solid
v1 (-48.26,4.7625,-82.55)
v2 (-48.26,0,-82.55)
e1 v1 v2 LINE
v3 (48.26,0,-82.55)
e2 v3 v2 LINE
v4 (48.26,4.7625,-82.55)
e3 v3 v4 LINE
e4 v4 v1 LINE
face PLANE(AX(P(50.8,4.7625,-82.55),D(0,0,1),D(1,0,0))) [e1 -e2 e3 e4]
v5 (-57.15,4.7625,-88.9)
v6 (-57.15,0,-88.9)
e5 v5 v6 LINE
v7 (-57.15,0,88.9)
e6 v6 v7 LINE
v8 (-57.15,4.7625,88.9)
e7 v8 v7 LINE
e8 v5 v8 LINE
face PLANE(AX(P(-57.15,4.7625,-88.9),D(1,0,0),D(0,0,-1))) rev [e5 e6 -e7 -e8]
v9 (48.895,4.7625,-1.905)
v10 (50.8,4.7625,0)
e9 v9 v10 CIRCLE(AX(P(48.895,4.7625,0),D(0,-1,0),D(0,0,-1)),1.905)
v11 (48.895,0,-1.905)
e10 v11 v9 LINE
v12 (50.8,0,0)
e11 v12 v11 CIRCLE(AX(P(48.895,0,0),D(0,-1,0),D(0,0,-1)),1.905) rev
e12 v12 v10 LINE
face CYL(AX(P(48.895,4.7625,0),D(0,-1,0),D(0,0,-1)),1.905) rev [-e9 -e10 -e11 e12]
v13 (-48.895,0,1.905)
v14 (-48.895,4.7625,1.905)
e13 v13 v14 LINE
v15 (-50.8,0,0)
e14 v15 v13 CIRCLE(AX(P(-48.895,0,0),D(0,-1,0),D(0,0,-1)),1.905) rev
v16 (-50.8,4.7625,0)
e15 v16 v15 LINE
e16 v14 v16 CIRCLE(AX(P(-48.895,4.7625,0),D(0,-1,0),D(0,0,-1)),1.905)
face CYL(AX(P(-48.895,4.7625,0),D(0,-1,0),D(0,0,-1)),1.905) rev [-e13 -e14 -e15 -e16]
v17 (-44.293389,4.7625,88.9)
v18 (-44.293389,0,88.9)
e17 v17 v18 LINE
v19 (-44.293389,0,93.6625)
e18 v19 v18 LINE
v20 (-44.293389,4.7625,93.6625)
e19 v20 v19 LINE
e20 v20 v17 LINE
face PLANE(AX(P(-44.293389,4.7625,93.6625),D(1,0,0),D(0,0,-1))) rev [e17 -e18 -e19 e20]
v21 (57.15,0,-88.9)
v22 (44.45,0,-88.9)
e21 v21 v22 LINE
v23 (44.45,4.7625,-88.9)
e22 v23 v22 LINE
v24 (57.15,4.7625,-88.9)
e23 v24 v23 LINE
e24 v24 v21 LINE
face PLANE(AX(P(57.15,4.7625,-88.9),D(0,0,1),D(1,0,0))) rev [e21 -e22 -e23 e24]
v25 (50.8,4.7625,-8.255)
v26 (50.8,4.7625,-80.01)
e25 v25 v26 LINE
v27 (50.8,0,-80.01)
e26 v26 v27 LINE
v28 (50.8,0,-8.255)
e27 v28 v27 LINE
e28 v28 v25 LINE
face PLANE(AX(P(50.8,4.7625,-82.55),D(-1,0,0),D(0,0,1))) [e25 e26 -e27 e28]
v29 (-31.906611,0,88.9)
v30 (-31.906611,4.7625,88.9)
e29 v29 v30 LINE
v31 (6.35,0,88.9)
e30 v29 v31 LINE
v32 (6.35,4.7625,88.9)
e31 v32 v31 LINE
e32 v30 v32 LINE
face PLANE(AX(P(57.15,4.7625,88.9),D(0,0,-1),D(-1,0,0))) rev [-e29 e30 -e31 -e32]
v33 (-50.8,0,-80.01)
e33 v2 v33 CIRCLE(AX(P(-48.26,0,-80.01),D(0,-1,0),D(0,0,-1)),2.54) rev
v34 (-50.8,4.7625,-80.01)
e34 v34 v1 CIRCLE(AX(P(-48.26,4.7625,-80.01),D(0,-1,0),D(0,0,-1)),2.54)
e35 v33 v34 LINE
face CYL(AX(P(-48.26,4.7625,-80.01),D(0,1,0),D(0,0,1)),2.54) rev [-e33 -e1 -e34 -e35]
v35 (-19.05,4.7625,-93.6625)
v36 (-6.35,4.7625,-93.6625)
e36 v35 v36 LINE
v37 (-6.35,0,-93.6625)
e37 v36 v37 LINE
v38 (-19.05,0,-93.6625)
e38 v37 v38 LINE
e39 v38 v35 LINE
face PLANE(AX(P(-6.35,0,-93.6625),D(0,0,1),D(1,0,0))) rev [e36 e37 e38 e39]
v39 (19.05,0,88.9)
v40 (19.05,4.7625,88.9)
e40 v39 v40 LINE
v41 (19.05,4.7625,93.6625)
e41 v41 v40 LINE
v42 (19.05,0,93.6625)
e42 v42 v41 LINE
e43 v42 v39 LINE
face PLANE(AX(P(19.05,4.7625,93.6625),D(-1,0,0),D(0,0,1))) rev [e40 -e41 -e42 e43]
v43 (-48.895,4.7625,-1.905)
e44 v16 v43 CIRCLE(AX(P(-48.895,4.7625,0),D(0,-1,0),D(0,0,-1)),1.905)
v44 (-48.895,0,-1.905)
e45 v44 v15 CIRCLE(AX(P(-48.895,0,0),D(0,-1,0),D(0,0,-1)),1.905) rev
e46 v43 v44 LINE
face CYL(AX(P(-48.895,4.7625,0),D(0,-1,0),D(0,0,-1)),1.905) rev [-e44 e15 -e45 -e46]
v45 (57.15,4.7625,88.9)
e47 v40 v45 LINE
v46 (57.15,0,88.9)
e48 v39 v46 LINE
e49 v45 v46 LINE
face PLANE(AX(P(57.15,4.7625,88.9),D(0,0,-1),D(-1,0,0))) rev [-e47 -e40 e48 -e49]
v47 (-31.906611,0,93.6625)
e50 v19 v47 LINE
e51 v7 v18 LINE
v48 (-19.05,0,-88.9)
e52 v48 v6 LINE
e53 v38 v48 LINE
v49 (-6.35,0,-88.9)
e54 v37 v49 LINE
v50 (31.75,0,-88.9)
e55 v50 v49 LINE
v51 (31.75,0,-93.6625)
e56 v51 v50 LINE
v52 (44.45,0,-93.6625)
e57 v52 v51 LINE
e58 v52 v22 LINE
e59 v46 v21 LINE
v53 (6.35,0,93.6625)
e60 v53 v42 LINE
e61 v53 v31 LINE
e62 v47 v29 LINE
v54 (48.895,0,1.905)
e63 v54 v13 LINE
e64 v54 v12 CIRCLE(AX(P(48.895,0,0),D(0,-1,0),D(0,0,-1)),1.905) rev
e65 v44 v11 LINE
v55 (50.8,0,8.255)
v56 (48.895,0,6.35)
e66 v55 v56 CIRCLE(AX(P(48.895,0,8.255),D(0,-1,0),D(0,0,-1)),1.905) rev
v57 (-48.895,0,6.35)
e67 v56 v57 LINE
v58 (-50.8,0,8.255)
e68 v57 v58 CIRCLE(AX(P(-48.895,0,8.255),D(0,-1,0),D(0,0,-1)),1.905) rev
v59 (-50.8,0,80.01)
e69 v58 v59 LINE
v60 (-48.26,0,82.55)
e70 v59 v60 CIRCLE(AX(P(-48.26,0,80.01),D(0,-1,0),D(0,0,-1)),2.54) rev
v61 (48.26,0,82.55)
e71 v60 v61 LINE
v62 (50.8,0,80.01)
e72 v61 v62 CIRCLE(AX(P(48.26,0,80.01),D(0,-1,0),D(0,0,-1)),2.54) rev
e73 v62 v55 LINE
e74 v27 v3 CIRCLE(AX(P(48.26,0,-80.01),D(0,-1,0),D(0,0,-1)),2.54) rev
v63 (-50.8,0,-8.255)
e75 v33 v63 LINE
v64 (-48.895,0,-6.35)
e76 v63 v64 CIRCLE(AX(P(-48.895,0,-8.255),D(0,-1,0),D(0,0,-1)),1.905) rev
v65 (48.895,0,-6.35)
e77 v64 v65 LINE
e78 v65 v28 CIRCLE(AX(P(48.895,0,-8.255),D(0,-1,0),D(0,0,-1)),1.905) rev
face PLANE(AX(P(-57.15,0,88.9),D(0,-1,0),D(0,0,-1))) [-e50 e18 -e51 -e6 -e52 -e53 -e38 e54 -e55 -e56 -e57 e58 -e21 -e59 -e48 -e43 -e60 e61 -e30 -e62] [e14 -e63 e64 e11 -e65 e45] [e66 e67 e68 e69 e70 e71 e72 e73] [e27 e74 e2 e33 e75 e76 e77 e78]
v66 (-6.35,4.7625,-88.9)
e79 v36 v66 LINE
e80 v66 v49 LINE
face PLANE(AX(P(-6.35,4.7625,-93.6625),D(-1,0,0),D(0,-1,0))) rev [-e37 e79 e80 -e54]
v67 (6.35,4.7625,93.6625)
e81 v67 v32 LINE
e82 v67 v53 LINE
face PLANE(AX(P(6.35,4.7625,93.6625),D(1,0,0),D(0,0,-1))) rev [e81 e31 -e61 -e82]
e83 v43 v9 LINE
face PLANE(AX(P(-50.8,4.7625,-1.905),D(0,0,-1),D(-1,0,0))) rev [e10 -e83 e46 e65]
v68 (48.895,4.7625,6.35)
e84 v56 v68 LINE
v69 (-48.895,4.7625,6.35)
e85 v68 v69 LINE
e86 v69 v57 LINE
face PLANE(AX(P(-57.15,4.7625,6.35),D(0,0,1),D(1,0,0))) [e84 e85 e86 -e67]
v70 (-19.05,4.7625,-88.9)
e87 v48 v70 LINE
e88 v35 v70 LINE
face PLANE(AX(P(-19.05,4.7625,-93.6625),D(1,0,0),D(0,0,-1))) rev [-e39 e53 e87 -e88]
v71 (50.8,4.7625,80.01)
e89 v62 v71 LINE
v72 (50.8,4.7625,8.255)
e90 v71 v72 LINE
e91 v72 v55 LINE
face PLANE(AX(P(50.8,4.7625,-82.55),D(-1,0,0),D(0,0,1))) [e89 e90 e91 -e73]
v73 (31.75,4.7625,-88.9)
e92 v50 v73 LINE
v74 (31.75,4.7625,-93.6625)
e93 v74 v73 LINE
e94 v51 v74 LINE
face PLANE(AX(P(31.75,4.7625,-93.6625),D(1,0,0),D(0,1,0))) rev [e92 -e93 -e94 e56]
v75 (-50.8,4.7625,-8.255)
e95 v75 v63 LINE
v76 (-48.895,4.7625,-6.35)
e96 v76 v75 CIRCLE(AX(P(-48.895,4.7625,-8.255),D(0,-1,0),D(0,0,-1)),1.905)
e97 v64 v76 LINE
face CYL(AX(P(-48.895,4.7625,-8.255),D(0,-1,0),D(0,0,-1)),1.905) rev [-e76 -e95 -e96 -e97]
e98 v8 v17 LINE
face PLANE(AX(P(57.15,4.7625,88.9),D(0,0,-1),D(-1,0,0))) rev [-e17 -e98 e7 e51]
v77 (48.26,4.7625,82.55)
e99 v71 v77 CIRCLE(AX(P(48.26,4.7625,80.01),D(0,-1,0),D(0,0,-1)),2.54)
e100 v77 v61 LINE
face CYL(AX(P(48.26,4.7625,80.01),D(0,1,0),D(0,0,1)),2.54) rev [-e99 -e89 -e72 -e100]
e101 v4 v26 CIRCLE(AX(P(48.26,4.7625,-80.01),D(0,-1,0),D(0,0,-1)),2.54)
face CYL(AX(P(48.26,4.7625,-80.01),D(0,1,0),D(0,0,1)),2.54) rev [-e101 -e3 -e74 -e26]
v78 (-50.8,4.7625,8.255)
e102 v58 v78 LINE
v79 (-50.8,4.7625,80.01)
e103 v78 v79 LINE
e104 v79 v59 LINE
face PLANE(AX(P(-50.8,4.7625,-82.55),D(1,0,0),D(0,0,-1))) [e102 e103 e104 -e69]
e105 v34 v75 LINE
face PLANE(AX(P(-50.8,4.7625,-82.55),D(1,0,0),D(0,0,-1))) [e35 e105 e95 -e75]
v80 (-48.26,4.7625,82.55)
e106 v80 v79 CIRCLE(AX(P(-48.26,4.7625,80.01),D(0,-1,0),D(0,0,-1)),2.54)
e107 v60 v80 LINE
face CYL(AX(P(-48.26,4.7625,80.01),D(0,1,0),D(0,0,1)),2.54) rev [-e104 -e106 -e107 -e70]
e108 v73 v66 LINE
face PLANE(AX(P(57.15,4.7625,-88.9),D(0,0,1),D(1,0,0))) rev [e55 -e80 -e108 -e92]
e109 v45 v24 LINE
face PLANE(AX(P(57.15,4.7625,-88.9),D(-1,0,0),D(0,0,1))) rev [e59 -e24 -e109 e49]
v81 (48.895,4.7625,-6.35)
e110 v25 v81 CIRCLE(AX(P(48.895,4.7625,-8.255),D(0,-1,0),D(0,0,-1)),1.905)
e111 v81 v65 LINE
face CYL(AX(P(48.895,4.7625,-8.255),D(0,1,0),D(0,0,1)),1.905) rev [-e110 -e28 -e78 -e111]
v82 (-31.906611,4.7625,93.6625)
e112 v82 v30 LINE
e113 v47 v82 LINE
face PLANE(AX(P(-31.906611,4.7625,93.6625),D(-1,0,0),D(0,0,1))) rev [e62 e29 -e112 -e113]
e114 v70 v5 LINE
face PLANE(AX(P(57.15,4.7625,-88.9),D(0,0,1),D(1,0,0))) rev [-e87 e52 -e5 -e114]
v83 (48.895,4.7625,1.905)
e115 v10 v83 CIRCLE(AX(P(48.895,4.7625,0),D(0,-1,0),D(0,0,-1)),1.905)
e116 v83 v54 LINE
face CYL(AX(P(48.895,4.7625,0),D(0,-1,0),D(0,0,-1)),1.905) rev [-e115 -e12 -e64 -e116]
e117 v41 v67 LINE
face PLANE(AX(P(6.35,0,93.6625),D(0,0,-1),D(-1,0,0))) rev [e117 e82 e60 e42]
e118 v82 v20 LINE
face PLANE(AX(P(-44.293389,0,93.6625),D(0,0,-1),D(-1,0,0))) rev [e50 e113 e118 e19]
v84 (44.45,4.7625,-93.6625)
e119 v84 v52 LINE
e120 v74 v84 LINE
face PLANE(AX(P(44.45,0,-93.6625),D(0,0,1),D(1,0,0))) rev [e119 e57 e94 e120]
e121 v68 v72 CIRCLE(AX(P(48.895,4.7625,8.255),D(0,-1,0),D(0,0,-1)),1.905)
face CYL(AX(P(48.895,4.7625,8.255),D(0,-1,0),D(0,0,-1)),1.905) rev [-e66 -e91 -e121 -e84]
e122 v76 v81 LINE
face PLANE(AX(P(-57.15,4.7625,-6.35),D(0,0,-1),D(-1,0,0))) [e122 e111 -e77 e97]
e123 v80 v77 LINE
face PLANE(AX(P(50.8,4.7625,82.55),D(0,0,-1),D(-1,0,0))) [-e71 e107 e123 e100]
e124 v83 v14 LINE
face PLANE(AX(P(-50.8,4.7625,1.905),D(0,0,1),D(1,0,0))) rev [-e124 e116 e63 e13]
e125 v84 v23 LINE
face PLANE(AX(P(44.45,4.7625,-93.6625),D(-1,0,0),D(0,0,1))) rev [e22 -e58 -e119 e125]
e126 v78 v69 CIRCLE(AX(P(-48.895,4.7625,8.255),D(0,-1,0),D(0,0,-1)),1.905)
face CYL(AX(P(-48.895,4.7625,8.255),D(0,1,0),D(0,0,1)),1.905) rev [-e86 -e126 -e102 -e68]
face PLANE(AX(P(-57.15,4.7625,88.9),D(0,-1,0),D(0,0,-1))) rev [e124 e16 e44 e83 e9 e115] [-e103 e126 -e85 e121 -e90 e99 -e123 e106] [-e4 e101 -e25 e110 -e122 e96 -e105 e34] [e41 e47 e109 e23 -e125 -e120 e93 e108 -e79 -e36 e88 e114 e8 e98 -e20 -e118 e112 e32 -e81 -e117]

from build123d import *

# Parameters (mm, degrees)
SKETCH1_W           = 114.3
SKETCH1_H           = 177.8
SKETCH1_W_2         = 101.6
SKETCH1_H_2         = 165.1
BOSS_EXTRUDE1_DEPTH = 4.7625
SKETCH2_W           = 12.38677804
SKETCH2_H           = 4.7625
SKETCH2_W_2         = 12.7
BOSS_EXTRUDE2_DEPTH = 4.7625
SKETCH3_W           = 12.7
SKETCH3_H           = 4.7625
BOSS_EXTRUDE3_DEPTH = 4.7625
FILLET1_R           = 2.54
SKETCH5_W           = 114.3
SKETCH5_H           = 12.7
SKETCH5_W_2         = 101.6
SKETCH5_H_2         = 3.81
BOSS_EXTRUDE5_DEPTH = 4.7625
FILLET3_R           = 1.905


with BuildPart() as part:
    # Sketch1 → Boss-Extrude1 (new body)
    with BuildSketch(Plane(origin=(0, 0, 0), x_dir=(1, 0, 0), z_dir=(0, 1, 0))):
        Rectangle(SKETCH1_W, SKETCH1_H)
        Rectangle(SKETCH1_W_2, SKETCH1_H_2, mode=Mode.SUBTRACT)
    extrude(amount=BOSS_EXTRUDE1_DEPTH)

    # Sketch2 → Boss-Extrude2 (add)
    with BuildSketch(Plane.XY.offset(88.9)):
        with Locations((-38.1, 2.38125)):
            Rectangle(SKETCH2_W, SKETCH2_H)
        with Locations((12.7, 2.38125)):
            Rectangle(SKETCH2_W_2, SKETCH2_H)
    extrude(amount=BOSS_EXTRUDE2_DEPTH)

    # Sketch3 → Boss-Extrude3 (add)
    with BuildSketch(Plane(origin=(0, 0, -88.9), x_dir=(-1, 0, 0), z_dir=(0, 0, -1))):
        with Locations((-38.1, 2.38125)):
            Rectangle(SKETCH3_W, SKETCH3_H)
        with Locations((12.7, 2.38125)):
            Rectangle(SKETCH3_W, SKETCH3_H)
    extrude(amount=BOSS_EXTRUDE3_DEPTH)

    # Fillet1
    fillet1_edges = [part.edges().sort_by_distance(p)[0] for p in [
        (50.8, 2.38125, 82.55),
        (50.8, 2.38125, -82.55),
        (-50.8, 2.38125, -82.55),
        (-50.8, 2.38125, 82.55),
    ]]
    fillet(fillet1_edges, radius=FILLET1_R)

    # Sketch5 → Boss-Extrude5 (add)
    with BuildSketch(Plane.XZ):
        Rectangle(SKETCH5_W, SKETCH5_H)
        Rectangle(SKETCH5_W_2, SKETCH5_H_2, mode=Mode.SUBTRACT)
    extrude(amount=-BOSS_EXTRUDE5_DEPTH)

    # Fillet3
    fillet3_edges = [part.edges().sort_by_distance(p)[0] for p in [
        (-50.8, 2.38125, 6.35),
        (-50.8, 2.38125, -6.35),
        (50.8, 2.38125, -6.35),
        (50.8, 2.38125, 6.35),
        (50.8, 2.38125, -1.905),
        (-50.8, 2.38125, -1.905),
        (-50.8, 2.38125, 1.905),
        (50.8, 2.38125, 1.905),
    ]]
    fillet(fillet3_edges, radius=FILLET3_R - 0.0001)  # a hair under: the kernel refuses the full size


solid = part.part
